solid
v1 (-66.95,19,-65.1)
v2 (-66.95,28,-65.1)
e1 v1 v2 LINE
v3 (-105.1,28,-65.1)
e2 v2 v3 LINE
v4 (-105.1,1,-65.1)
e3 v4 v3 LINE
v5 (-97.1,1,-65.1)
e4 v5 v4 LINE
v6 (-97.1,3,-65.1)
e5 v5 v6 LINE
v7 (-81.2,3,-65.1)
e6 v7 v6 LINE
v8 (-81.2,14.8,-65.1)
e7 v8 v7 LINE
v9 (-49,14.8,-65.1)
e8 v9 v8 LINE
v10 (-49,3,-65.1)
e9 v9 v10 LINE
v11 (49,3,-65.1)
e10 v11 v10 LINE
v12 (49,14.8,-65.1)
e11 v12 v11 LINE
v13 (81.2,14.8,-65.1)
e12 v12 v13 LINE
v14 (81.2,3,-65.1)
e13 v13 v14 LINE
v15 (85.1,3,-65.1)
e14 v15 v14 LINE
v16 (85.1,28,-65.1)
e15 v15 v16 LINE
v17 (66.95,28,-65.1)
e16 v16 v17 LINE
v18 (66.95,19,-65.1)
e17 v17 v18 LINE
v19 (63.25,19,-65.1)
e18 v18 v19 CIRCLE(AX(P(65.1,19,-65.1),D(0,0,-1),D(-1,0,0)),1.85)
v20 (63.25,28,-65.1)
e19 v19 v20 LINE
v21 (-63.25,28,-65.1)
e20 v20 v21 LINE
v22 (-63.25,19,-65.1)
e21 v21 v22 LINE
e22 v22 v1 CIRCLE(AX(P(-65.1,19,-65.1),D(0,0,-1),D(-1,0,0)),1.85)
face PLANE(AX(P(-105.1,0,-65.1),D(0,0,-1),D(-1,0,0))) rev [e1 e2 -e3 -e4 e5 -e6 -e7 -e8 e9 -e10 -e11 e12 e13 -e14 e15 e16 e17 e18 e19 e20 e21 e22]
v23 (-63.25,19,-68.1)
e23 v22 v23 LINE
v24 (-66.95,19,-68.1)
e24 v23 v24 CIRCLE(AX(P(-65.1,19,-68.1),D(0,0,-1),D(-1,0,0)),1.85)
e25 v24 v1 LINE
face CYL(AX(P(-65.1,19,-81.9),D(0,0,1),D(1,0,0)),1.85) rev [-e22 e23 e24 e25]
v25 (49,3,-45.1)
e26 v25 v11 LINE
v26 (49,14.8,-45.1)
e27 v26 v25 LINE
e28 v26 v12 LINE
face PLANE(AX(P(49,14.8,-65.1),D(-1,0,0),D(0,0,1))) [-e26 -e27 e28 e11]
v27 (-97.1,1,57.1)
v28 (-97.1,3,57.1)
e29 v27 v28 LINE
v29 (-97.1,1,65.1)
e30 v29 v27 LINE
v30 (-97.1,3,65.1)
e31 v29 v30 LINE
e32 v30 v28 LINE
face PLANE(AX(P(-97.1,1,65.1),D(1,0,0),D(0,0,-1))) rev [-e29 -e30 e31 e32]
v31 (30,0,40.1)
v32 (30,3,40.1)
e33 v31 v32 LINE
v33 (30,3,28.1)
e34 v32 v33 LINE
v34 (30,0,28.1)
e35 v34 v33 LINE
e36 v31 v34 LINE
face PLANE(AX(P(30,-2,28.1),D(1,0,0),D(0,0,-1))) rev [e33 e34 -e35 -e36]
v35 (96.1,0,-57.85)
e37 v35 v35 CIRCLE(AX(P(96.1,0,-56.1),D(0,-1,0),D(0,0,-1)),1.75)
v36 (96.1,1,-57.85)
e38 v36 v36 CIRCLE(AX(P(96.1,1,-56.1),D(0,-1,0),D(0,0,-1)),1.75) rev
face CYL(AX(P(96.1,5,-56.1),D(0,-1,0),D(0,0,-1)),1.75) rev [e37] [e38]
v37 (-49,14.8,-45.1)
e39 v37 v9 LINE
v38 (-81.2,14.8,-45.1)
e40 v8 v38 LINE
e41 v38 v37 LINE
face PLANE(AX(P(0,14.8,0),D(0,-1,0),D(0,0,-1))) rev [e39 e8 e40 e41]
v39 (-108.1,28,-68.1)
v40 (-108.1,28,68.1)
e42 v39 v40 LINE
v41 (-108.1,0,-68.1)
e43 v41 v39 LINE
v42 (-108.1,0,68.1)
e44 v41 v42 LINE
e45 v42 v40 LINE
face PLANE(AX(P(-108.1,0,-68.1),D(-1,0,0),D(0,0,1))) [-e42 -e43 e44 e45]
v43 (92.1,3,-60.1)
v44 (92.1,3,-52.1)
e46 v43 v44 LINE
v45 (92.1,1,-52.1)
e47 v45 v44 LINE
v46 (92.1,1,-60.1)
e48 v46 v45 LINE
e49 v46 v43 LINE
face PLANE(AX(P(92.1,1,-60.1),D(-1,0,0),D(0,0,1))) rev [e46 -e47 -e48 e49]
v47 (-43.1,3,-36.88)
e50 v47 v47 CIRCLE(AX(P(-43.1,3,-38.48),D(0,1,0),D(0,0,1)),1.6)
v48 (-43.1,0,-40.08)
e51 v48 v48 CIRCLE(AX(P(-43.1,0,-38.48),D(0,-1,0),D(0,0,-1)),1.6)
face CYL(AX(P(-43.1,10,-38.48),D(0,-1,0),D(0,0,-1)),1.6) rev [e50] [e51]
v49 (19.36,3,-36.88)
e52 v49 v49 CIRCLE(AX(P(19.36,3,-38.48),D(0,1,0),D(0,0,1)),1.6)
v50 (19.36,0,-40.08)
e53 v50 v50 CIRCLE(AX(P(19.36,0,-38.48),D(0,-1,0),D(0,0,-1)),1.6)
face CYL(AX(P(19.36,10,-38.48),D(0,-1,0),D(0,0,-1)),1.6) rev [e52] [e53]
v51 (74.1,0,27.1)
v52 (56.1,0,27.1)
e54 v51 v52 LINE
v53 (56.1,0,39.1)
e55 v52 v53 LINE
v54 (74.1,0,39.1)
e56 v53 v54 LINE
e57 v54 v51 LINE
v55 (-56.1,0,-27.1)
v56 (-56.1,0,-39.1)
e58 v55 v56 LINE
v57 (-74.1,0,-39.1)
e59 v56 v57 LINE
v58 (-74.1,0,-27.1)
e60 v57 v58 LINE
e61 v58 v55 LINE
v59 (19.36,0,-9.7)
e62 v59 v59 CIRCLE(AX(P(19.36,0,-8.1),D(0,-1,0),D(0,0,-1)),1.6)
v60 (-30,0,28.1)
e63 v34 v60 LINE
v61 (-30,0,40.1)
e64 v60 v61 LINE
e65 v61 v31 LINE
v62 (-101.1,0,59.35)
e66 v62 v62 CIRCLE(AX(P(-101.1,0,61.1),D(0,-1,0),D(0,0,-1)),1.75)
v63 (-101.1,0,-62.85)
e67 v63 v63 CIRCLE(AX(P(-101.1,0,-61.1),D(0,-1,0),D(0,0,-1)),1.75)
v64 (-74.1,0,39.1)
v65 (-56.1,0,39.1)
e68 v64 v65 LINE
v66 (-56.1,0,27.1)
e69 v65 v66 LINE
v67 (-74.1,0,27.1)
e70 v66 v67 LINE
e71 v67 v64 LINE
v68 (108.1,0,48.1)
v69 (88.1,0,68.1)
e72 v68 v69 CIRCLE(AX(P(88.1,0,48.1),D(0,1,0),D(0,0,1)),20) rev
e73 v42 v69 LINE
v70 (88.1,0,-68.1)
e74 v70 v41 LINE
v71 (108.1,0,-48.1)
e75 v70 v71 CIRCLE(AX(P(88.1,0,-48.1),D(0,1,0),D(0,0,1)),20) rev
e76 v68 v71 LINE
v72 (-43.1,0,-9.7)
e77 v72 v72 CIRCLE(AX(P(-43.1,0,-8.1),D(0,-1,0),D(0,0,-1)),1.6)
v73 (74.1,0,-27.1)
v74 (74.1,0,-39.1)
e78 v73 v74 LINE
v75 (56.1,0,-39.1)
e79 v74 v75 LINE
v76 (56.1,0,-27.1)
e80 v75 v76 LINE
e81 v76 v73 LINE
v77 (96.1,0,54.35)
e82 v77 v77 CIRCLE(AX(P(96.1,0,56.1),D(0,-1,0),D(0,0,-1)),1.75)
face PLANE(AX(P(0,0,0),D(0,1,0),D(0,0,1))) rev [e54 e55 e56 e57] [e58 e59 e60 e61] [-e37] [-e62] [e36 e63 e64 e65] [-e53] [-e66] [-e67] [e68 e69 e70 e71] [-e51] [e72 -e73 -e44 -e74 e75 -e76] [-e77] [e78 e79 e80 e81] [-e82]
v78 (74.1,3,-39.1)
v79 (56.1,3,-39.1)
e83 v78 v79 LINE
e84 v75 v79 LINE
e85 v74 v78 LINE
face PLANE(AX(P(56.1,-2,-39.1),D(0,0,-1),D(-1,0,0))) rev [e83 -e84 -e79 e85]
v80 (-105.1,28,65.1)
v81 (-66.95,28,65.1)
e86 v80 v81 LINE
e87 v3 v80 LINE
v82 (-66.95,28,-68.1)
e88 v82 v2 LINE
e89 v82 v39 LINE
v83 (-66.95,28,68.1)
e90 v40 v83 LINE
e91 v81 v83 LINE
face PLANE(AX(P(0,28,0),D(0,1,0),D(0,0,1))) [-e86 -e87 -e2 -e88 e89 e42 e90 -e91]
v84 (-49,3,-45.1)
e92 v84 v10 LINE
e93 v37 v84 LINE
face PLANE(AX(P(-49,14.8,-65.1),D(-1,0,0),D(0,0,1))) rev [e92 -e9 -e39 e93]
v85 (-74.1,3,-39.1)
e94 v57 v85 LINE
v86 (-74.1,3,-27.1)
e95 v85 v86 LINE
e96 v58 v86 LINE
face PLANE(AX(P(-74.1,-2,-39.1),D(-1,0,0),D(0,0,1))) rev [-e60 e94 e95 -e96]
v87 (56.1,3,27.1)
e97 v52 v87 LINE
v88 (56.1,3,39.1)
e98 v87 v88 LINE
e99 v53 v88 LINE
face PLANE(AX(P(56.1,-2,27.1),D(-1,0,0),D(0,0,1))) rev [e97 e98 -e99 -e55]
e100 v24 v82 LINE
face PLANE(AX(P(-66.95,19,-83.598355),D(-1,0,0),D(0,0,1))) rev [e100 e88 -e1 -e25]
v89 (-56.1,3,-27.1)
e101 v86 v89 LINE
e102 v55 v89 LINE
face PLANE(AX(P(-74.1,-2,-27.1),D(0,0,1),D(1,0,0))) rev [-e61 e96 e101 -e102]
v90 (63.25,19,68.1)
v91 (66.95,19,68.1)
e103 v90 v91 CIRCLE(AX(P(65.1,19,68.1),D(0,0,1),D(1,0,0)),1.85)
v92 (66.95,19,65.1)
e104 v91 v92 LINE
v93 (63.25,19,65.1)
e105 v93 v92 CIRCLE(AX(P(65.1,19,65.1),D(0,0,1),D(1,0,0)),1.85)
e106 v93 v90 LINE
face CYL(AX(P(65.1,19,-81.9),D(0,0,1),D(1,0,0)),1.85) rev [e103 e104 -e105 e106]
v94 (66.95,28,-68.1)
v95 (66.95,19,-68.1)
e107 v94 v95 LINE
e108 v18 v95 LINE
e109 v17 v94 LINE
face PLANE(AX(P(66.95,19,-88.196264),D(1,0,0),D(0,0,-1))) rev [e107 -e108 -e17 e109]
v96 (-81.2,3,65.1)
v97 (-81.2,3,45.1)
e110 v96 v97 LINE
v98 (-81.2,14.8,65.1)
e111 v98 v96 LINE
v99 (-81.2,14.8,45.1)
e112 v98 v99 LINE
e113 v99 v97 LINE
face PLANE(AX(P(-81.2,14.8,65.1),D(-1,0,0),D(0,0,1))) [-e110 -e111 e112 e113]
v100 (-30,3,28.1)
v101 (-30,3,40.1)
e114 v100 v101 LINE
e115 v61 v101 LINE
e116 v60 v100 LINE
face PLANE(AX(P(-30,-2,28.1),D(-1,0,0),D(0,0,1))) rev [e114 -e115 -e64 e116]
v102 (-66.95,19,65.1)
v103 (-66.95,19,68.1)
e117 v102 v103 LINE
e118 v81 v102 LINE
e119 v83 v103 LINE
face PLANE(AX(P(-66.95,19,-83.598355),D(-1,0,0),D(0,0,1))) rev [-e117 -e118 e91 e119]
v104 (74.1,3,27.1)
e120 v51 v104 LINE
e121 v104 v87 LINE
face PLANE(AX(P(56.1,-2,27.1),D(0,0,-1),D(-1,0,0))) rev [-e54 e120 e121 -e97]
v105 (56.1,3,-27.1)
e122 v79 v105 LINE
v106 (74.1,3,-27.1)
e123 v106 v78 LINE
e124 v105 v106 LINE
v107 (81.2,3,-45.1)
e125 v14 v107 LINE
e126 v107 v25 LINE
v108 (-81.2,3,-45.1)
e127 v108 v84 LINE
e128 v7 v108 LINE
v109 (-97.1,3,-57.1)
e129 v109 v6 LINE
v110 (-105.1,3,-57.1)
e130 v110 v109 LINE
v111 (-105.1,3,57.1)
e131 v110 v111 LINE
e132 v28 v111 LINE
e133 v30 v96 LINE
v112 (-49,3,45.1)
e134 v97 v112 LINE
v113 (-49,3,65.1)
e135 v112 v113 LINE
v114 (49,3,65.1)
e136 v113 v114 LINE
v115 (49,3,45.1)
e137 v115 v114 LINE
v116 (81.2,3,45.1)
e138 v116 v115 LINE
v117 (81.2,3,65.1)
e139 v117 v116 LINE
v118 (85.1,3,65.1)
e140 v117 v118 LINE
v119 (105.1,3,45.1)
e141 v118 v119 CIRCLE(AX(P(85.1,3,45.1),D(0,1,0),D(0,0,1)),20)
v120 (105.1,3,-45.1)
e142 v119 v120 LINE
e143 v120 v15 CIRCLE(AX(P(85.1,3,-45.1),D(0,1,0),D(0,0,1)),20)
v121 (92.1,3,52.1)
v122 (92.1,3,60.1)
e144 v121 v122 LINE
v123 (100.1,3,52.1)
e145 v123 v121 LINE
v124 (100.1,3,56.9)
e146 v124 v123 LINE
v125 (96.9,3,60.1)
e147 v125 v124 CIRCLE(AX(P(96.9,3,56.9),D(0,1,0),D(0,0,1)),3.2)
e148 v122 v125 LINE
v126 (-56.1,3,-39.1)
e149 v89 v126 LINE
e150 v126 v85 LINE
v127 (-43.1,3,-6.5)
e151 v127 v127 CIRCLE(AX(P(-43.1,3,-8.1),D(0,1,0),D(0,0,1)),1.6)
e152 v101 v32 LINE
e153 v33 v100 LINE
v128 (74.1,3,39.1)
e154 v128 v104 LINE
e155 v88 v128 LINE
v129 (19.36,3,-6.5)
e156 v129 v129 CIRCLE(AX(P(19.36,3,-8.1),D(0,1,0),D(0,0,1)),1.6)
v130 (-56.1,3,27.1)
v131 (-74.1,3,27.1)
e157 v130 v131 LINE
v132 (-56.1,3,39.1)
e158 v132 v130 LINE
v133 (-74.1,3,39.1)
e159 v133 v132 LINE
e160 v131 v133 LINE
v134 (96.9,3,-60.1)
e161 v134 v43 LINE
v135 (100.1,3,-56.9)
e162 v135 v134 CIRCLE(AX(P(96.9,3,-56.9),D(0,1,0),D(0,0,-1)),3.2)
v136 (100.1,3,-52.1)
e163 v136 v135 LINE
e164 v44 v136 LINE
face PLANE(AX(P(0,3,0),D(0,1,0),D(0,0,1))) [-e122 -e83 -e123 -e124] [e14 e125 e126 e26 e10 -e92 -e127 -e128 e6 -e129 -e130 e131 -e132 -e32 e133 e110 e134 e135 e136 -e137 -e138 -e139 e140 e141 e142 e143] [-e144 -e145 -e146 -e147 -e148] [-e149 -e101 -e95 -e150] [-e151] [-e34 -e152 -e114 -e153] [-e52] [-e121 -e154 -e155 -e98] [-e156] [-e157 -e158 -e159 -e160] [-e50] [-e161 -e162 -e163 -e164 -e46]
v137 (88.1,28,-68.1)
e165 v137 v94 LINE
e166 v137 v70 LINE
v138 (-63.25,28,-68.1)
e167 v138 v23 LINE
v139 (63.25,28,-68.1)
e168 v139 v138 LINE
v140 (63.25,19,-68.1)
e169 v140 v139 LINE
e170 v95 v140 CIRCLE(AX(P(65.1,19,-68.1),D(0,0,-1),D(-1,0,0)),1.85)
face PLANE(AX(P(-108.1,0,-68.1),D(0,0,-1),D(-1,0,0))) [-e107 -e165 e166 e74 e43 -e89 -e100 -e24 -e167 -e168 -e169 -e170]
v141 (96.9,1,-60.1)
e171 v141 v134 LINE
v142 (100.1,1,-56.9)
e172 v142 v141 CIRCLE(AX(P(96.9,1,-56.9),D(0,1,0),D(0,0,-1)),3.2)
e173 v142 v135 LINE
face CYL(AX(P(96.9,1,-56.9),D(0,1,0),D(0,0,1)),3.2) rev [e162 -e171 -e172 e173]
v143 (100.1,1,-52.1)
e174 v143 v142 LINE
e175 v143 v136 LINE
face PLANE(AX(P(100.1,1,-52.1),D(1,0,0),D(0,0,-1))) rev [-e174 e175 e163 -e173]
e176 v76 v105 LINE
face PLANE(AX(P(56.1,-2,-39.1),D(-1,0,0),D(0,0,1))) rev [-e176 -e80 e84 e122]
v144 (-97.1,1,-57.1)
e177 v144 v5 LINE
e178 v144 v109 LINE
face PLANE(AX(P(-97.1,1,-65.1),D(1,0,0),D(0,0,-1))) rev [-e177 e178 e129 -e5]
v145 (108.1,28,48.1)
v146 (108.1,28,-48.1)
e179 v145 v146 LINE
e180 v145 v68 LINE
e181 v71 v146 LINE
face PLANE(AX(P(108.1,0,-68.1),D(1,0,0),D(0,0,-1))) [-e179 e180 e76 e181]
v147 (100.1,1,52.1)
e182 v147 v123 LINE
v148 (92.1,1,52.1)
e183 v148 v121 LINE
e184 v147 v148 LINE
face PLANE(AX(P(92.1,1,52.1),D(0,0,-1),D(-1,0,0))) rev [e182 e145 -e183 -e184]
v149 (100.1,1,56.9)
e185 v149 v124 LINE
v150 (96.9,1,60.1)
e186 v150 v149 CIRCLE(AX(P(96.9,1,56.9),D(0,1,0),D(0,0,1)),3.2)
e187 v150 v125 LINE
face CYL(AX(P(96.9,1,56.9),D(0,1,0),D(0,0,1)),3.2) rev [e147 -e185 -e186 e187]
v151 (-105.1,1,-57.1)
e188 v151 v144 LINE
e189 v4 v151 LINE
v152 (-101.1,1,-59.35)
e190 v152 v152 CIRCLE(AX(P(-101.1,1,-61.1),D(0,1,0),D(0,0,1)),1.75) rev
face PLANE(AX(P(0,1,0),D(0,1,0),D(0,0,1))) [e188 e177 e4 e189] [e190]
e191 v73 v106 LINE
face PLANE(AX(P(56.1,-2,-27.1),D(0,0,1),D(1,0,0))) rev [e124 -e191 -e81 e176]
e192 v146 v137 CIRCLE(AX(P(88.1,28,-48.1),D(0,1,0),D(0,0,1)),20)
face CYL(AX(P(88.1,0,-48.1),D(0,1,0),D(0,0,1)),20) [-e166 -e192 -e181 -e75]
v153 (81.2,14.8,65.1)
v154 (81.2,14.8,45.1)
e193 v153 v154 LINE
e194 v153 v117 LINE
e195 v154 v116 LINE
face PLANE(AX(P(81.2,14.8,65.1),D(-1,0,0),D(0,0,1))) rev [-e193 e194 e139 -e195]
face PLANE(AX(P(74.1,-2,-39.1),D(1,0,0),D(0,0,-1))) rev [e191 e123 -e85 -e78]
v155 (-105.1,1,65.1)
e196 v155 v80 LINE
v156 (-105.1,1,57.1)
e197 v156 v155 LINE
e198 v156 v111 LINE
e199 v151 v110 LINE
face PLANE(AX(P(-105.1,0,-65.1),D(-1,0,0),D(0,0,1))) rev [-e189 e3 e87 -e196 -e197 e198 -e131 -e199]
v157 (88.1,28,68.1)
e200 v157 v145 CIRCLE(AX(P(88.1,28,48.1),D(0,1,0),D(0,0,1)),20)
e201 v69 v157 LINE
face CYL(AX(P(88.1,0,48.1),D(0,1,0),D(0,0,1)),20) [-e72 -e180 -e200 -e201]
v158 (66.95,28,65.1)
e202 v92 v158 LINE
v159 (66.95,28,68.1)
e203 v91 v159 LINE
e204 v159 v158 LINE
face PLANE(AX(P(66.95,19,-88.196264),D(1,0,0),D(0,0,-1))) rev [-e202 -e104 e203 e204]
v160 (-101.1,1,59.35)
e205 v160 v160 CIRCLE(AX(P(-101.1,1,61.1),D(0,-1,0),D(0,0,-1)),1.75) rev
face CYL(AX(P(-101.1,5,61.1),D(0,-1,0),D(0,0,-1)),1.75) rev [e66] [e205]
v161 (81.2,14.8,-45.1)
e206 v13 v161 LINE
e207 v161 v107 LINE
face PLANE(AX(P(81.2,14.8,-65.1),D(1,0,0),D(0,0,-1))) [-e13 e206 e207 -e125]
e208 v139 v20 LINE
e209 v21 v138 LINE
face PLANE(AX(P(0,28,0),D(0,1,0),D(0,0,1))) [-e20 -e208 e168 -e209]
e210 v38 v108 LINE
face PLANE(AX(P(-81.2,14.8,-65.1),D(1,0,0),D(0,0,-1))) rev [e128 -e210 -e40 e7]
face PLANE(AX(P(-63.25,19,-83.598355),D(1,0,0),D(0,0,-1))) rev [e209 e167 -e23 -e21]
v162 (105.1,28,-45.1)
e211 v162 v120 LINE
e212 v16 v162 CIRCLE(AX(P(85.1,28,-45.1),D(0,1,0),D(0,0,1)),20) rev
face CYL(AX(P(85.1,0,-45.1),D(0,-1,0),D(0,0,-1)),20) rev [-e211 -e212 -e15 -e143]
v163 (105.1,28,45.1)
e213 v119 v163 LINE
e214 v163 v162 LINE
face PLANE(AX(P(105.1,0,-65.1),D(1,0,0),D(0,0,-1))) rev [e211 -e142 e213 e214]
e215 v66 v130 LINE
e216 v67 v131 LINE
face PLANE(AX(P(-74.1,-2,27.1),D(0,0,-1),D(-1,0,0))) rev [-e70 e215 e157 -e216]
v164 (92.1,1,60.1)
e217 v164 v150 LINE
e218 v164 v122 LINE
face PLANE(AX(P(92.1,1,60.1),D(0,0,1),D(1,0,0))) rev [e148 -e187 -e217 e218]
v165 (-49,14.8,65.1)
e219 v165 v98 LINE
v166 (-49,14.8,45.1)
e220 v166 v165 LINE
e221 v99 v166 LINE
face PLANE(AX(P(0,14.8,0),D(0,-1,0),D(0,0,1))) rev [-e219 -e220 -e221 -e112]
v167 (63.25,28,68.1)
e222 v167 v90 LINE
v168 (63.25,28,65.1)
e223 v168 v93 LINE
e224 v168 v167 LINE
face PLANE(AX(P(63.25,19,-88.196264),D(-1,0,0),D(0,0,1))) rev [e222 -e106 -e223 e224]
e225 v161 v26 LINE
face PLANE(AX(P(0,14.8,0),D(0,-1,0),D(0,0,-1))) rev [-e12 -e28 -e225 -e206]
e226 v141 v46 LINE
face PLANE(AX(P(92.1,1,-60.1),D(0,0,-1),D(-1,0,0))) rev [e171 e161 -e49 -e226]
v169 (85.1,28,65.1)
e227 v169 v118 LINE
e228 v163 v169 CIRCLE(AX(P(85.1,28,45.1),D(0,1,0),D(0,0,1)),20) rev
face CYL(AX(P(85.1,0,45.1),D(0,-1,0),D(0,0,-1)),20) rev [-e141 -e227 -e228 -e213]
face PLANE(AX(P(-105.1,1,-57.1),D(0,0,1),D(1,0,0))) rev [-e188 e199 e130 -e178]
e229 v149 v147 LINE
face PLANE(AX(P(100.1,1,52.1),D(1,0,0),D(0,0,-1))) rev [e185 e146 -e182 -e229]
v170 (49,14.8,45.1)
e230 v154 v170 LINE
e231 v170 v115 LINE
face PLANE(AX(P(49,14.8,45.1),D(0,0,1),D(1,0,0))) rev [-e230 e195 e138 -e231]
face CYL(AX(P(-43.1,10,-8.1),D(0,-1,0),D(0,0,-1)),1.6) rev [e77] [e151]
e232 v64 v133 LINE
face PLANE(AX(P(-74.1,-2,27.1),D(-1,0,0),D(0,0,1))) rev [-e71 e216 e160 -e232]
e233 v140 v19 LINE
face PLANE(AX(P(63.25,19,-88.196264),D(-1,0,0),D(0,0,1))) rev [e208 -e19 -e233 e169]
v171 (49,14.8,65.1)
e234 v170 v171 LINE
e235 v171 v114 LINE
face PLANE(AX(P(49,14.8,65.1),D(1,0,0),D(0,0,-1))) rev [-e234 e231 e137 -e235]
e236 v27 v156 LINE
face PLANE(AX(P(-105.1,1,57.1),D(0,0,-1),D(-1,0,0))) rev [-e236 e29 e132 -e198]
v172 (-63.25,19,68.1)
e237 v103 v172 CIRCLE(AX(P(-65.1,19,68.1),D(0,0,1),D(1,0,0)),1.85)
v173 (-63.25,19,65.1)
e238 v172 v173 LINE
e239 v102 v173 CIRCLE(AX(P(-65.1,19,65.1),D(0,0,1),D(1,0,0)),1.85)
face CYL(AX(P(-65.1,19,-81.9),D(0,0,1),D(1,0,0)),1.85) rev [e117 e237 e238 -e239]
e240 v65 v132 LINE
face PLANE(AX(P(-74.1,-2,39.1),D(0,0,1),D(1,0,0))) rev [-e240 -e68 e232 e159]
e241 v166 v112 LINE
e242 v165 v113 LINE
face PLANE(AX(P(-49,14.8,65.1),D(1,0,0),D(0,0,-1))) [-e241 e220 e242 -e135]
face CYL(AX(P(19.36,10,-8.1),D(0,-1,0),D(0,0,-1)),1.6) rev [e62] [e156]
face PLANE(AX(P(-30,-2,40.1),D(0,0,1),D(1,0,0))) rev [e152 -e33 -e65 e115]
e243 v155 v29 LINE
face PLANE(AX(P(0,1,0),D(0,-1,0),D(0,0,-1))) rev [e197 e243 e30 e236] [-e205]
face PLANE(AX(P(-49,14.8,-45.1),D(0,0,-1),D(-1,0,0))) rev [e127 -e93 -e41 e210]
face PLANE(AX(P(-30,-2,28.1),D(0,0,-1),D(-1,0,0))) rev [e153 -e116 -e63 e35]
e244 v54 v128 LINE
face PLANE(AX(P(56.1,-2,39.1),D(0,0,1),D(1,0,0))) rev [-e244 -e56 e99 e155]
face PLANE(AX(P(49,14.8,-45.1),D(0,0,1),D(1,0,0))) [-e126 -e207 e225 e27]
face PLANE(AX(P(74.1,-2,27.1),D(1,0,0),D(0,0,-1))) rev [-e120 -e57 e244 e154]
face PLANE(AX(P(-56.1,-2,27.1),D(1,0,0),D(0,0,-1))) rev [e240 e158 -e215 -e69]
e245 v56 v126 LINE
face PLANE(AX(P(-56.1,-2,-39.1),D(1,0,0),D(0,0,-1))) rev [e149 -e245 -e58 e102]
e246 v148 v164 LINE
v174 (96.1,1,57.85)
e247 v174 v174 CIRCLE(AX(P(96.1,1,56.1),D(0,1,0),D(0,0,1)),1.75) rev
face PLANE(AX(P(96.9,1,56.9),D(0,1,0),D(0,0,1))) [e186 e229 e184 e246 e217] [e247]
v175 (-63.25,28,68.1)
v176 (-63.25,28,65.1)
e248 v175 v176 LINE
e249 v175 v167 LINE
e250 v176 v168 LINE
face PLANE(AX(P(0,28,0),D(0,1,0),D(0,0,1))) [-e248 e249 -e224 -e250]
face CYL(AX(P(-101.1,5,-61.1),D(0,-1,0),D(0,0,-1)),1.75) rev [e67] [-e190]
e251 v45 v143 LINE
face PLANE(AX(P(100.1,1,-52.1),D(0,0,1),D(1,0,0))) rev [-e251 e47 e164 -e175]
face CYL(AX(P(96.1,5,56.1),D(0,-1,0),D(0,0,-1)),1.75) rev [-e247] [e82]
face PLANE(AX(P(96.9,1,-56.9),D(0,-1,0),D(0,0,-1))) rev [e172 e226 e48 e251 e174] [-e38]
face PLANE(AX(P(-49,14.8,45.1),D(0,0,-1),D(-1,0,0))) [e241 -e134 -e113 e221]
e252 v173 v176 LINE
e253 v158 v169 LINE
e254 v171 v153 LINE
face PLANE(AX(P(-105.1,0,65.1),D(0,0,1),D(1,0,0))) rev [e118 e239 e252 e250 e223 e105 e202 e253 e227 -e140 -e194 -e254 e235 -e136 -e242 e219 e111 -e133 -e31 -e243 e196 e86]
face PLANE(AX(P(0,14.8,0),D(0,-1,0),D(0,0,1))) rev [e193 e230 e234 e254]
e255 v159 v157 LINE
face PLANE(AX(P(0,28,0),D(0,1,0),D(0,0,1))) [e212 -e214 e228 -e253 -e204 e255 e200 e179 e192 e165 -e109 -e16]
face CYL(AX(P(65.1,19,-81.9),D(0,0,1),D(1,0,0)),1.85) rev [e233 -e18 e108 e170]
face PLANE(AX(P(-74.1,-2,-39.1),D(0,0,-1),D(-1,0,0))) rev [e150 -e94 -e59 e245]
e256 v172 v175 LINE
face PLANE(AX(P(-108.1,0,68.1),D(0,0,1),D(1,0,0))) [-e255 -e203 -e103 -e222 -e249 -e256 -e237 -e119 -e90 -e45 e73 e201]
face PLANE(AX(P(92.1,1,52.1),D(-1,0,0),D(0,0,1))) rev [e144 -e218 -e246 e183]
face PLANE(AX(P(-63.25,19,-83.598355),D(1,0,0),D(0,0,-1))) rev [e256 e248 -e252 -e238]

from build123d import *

# Parameters (mm, degrees)
SKETCH1_W                = 210.2
SKETCH1_H                = 130.2
BOSS_EXTRUDE1_DEPTH      = 3
FILLET1_R                = 20
BOSS_EXTRUDE3_DEPTH      = 25
BOSS_EXTRUDE3_DEPTH_BACK = 3
SKETCH2_W                = 216.2
SKETCH2_H                = 136.2
SKETCH2_W_2              = 210.2
SKETCH2_H_2              = 130.2
FILLET2_START            = -1
FILLET2_DEPTH            = 29
FILLET2_2_DEPTH          = 28
SKETCH5_W                = 32.2
SKETCH5_H                = 20
BOSS_EXTRUDE4_DEPTH      = 11.8
MIRROR2_COPY_1_SKETCH_W  = 32.2
MIRROR2_COPY_1_SKETCH_H  = 20
MIRROR2_COPY_1_DEPTH     = 11.8
SKETCH4_W                = 3.7
SKETCH4_H                = 167.196709826
SKETCH4_H_2              = 176.392528866
CUT_EXTRUDE1_DEPTH       = 9
CROQUIS1_R               = 1.75
CORTAR_EXTRUIR1_DEPTH    = 5
CROQUIS2_W               = 18
CROQUIS2_H               = 12
CROQUIS2_W_2             = 60
CORTAR_EXTRUIR2_DEPTH    = 5
CROQUIS3_W               = 8
CROQUIS3_H               = 8
CORTAR_EXTRUIR3_DEPTH    = 2
CORTAR_EXTRUIR4_DEPTH    = 150
CROQUIS5_R               = 1.6
CORTAR_EXTRUIR5_DEPTH    = 10


with BuildPart() as part:
    # Sketch1 → Boss-Extrude1 (new body)
    with BuildSketch(Plane(origin=(0, 0, 0), x_dir=(1, 0, 0), z_dir=(0, 1, 0))):
        Rectangle(SKETCH1_W, SKETCH1_H)
    extrude(amount=BOSS_EXTRUDE1_DEPTH)

    # Fillet1
    fillet1_edges = [part.edges().sort_by_distance(p)[0] for p in [
        (105.1, 1.5, 65.1),
        (105.1, 1.5, -65.1),
    ]]
    fillet(fillet1_edges, radius=FILLET1_R)

    # Sketch2 → Boss-Extrude3 (add, two sides: drawn at the far end of the back side and taken through both)
    with BuildSketch(Plane(origin=(0, 3, 0), x_dir=(1, 0, 0), z_dir=(0, 1, 0)).offset(-BOSS_EXTRUDE3_DEPTH_BACK)):
        Rectangle(SKETCH2_W, SKETCH2_H)
        Rectangle(SKETCH2_W_2, SKETCH2_H_2, mode=Mode.SUBTRACT)
    extrude(amount=BOSS_EXTRUDE3_DEPTH + BOSS_EXTRUDE3_DEPTH_BACK)

    # Fillet2: read off the stored shape, not the designer's step
    # Fillet2 outline → Fillet2 (cut)
    with BuildSketch(Plane(origin=(0, 0, 0), x_dir=(1, 0, 0), z_dir=(0, 1, 0)).offset(FILLET2_START)):
        with BuildLine():
            ThreePointArc((98.635653754, -65.1), (93.577225575, -67.335384062), (88.1, -68.1))
            Line((88.1, -68.1), (108.1, -68.1))
            Line((108.1, -68.1), (108.1, -48.1))
            ThreePointArc((108.1, -48.1), (107.335384062, -53.577225575), (105.1, -58.635653754))
            Line((105.1, -58.635653754), (105.1, -65.1))
            Line((105.1, -65.1), (98.635653754, -65.1))
        make_face()
        with BuildLine():
            ThreePointArc((105.1, 58.635653754), (107.335384062, 53.577225575), (108.1, 48.1))
            Line((108.1, 48.1), (108.1, 68.1))
            Line((108.1, 68.1), (88.1, 68.1))
            ThreePointArc((88.1, 68.1), (93.577225575, 67.335384062), (98.635653754, 65.1))
            Line((98.635653754, 65.1), (105.1, 65.1))
            Line((105.1, 65.1), (105.1, 58.635653754))
        make_face()
    extrude(amount=FILLET2_DEPTH, mode=Mode.SUBTRACT)

    # Fillet2 2 outline → Fillet2 2 (add)
    with BuildSketch(Plane(origin=(0, 0, 0), x_dir=(1, 0, 0), z_dir=(0, 1, 0))):
        with BuildLine():
            Line((85.1, -65.1), (98.635653754, -65.1))
            ThreePointArc((98.635653754, -65.1), (102.242135624, -62.242135624), (105.1, -58.635653754))
            Line((105.1, -58.635653754), (105.1, -45.1))
            ThreePointArc((105.1, -45.1), (99.242135624, -59.242135624), (85.1, -65.1))
        make_face()
        with BuildLine():
            ThreePointArc((85.1, 65.1), (99.242135624, 59.242135624), (105.1, 45.1))
            Line((105.1, 45.1), (105.1, 58.635653754))
            ThreePointArc((105.1, 58.635653754), (102.242135624, 62.242135624), (98.635653754, 65.1))
            Line((98.635653754, 65.1), (85.1, 65.1))
        make_face()
    extrude(amount=FILLET2_2_DEPTH)

    # Sketch5 → Boss-Extrude4 (add)
    with BuildSketch(Plane(origin=(0, 3, 0), x_dir=(1, 0, 0), z_dir=(0, 1, 0))):
        with Locations((-65.1, 55.1)):
            Rectangle(SKETCH5_W, SKETCH5_H)
    boss_extrude4 = extrude(amount=BOSS_EXTRUDE4_DEPTH)

    # Mirror1: Boss-Extrude4 across plane
    add(boss_extrude4.mirror(Plane(origin=(0, 0, 0), x_dir=(0, 0, 1), z_dir=(1, 0, 0))))

    # Mirror2: Boss-Extrude4 across plane
    add(boss_extrude4.mirror(Plane.XY))

    # Mirror2 copy 1 sketch → Mirror2 copy 1 (add)
    with BuildSketch(Plane(origin=(0, 3, 0), x_dir=(-1, 0, 0), z_dir=(0, 1, 0))):
        with Locations((-65.1, 55.1)):
            Rectangle(MIRROR2_COPY_1_SKETCH_W, MIRROR2_COPY_1_SKETCH_H)
    extrude(amount=MIRROR2_COPY_1_DEPTH)

    # Sketch4 → Cut-Extrude1 (cut)
    with BuildSketch(Plane(origin=(0, 28, 0), x_dir=(1, 0, 0), z_dir=(0, 1, 0))):
        with Locations((-65.1, 0)):
            Rectangle(SKETCH4_W, SKETCH4_H)
        with Locations((65.1, 0)):
            Rectangle(SKETCH4_W, SKETCH4_H_2)
    extrude(amount=-CUT_EXTRUDE1_DEPTH, mode=Mode.SUBTRACT)

    # Croquis1 → Cortar-Extruir1 (cut)
    with BuildSketch(Plane.XZ):
        with Locations(Location((-101.1, 61.1, 0), (0, 0, 270))):
            Circle(CROQUIS1_R)
        with Locations(Location((-101.1, -61.1, 0), (0, 0, 270))):
            Circle(CROQUIS1_R)
        with Locations(Location((96.1, 56.1, 0), (0, 0, 270))):
            Circle(CROQUIS1_R)
        with Locations(Location((96.1, -56.1, 0), (0, 0, 270))):
            Circle(CROQUIS1_R)
    extrude(amount=-CORTAR_EXTRUIR1_DEPTH, mode=Mode.SUBTRACT)

    # Croquis2 → Cortar-Extruir2 (cut)
    with BuildSketch(Plane(origin=(0, 3, 0), x_dir=(1, 0, 0), z_dir=(0, 1, 0))):
        with Locations((-65.1, 33.1)):
            Rectangle(CROQUIS2_W, CROQUIS2_H)
        with Locations((-65.1, -33.1)):
            Rectangle(CROQUIS2_W, CROQUIS2_H)
        with Locations((65.1, 33.1)):
            Rectangle(CROQUIS2_W, CROQUIS2_H)
        with Locations((65.1, -33.1)):
            Rectangle(CROQUIS2_W, CROQUIS2_H)
        with Locations((0, -34.1)):
            Rectangle(CROQUIS2_W_2, CROQUIS2_H)
    extrude(amount=-CORTAR_EXTRUIR2_DEPTH, mode=Mode.SUBTRACT)

    # Croquis3 → Cortar-Extruir3 (cut)
    with BuildSketch(Plane(origin=(0, 3, 0), x_dir=(1, 0, 0), z_dir=(0, 1, 0))):
        with BuildLine():
            Line((92.1, 60.1), (96.9, 60.1))
            ThreePointArc((96.9, 60.1), (99.1627417, 59.1627417), (100.1, 56.9))
            Line((100.1, 56.9), (100.1, 52.1))
            Line((100.1, 52.1), (92.1, 52.1))
            Line((92.1, 52.1), (92.1, 60.1))
        make_face()
        with Locations((-101.1, 61.1)):
            Rectangle(CROQUIS3_W, CROQUIS3_H)
        with Locations((-101.1, -61.1)):
            Rectangle(CROQUIS3_W, CROQUIS3_H)
        with BuildLine():
            Line((92.1, -52.1), (100.1, -52.1))
            Line((100.1, -52.1), (100.1, -56.9))
            ThreePointArc((100.1, -56.9), (99.1627417, -59.1627417), (96.9, -60.1))
            Line((96.9, -60.1), (92.1, -60.1))
            Line((92.1, -60.1), (92.1, -52.1))
        make_face()
    extrude(amount=-CORTAR_EXTRUIR3_DEPTH, mode=Mode.SUBTRACT)

    # Croquis4 → Cortar-Extruir4 (cut)
    with BuildSketch(Plane.XY.offset(68.1)):
        with BuildLine():
            Line((-66.95, 19), (-63.25, 19))
            ThreePointArc((-63.25, 19), (-65.1, 17.15), (-66.95, 19))
        make_face()
        with BuildLine():
            Line((66.95, 19), (63.25, 19))
            ThreePointArc((63.25, 19), (65.1, 17.15), (66.95, 19))
        make_face()
    extrude(amount=-CORTAR_EXTRUIR4_DEPTH, mode=Mode.SUBTRACT)

    # Croquis5 → Cortar-Extruir5 (cut)
    with BuildSketch(Plane.XZ):
        with Locations(Location((-43.1, -8.1, 0), (0, 0, 270))):
            Circle(CROQUIS5_R)
        with Locations(Location((-43.1, -38.48, 0), (0, 0, 270))):
            Circle(CROQUIS5_R)
        with Locations(Location((19.36, -8.1, 0), (0, 0, 270))):
            Circle(CROQUIS5_R)
        with Locations(Location((19.36, -38.48, 0), (0, 0, 270))):
            Circle(CROQUIS5_R)
    extrude(amount=-CORTAR_EXTRUIR5_DEPTH, mode=Mode.SUBTRACT)


solid = part.part
